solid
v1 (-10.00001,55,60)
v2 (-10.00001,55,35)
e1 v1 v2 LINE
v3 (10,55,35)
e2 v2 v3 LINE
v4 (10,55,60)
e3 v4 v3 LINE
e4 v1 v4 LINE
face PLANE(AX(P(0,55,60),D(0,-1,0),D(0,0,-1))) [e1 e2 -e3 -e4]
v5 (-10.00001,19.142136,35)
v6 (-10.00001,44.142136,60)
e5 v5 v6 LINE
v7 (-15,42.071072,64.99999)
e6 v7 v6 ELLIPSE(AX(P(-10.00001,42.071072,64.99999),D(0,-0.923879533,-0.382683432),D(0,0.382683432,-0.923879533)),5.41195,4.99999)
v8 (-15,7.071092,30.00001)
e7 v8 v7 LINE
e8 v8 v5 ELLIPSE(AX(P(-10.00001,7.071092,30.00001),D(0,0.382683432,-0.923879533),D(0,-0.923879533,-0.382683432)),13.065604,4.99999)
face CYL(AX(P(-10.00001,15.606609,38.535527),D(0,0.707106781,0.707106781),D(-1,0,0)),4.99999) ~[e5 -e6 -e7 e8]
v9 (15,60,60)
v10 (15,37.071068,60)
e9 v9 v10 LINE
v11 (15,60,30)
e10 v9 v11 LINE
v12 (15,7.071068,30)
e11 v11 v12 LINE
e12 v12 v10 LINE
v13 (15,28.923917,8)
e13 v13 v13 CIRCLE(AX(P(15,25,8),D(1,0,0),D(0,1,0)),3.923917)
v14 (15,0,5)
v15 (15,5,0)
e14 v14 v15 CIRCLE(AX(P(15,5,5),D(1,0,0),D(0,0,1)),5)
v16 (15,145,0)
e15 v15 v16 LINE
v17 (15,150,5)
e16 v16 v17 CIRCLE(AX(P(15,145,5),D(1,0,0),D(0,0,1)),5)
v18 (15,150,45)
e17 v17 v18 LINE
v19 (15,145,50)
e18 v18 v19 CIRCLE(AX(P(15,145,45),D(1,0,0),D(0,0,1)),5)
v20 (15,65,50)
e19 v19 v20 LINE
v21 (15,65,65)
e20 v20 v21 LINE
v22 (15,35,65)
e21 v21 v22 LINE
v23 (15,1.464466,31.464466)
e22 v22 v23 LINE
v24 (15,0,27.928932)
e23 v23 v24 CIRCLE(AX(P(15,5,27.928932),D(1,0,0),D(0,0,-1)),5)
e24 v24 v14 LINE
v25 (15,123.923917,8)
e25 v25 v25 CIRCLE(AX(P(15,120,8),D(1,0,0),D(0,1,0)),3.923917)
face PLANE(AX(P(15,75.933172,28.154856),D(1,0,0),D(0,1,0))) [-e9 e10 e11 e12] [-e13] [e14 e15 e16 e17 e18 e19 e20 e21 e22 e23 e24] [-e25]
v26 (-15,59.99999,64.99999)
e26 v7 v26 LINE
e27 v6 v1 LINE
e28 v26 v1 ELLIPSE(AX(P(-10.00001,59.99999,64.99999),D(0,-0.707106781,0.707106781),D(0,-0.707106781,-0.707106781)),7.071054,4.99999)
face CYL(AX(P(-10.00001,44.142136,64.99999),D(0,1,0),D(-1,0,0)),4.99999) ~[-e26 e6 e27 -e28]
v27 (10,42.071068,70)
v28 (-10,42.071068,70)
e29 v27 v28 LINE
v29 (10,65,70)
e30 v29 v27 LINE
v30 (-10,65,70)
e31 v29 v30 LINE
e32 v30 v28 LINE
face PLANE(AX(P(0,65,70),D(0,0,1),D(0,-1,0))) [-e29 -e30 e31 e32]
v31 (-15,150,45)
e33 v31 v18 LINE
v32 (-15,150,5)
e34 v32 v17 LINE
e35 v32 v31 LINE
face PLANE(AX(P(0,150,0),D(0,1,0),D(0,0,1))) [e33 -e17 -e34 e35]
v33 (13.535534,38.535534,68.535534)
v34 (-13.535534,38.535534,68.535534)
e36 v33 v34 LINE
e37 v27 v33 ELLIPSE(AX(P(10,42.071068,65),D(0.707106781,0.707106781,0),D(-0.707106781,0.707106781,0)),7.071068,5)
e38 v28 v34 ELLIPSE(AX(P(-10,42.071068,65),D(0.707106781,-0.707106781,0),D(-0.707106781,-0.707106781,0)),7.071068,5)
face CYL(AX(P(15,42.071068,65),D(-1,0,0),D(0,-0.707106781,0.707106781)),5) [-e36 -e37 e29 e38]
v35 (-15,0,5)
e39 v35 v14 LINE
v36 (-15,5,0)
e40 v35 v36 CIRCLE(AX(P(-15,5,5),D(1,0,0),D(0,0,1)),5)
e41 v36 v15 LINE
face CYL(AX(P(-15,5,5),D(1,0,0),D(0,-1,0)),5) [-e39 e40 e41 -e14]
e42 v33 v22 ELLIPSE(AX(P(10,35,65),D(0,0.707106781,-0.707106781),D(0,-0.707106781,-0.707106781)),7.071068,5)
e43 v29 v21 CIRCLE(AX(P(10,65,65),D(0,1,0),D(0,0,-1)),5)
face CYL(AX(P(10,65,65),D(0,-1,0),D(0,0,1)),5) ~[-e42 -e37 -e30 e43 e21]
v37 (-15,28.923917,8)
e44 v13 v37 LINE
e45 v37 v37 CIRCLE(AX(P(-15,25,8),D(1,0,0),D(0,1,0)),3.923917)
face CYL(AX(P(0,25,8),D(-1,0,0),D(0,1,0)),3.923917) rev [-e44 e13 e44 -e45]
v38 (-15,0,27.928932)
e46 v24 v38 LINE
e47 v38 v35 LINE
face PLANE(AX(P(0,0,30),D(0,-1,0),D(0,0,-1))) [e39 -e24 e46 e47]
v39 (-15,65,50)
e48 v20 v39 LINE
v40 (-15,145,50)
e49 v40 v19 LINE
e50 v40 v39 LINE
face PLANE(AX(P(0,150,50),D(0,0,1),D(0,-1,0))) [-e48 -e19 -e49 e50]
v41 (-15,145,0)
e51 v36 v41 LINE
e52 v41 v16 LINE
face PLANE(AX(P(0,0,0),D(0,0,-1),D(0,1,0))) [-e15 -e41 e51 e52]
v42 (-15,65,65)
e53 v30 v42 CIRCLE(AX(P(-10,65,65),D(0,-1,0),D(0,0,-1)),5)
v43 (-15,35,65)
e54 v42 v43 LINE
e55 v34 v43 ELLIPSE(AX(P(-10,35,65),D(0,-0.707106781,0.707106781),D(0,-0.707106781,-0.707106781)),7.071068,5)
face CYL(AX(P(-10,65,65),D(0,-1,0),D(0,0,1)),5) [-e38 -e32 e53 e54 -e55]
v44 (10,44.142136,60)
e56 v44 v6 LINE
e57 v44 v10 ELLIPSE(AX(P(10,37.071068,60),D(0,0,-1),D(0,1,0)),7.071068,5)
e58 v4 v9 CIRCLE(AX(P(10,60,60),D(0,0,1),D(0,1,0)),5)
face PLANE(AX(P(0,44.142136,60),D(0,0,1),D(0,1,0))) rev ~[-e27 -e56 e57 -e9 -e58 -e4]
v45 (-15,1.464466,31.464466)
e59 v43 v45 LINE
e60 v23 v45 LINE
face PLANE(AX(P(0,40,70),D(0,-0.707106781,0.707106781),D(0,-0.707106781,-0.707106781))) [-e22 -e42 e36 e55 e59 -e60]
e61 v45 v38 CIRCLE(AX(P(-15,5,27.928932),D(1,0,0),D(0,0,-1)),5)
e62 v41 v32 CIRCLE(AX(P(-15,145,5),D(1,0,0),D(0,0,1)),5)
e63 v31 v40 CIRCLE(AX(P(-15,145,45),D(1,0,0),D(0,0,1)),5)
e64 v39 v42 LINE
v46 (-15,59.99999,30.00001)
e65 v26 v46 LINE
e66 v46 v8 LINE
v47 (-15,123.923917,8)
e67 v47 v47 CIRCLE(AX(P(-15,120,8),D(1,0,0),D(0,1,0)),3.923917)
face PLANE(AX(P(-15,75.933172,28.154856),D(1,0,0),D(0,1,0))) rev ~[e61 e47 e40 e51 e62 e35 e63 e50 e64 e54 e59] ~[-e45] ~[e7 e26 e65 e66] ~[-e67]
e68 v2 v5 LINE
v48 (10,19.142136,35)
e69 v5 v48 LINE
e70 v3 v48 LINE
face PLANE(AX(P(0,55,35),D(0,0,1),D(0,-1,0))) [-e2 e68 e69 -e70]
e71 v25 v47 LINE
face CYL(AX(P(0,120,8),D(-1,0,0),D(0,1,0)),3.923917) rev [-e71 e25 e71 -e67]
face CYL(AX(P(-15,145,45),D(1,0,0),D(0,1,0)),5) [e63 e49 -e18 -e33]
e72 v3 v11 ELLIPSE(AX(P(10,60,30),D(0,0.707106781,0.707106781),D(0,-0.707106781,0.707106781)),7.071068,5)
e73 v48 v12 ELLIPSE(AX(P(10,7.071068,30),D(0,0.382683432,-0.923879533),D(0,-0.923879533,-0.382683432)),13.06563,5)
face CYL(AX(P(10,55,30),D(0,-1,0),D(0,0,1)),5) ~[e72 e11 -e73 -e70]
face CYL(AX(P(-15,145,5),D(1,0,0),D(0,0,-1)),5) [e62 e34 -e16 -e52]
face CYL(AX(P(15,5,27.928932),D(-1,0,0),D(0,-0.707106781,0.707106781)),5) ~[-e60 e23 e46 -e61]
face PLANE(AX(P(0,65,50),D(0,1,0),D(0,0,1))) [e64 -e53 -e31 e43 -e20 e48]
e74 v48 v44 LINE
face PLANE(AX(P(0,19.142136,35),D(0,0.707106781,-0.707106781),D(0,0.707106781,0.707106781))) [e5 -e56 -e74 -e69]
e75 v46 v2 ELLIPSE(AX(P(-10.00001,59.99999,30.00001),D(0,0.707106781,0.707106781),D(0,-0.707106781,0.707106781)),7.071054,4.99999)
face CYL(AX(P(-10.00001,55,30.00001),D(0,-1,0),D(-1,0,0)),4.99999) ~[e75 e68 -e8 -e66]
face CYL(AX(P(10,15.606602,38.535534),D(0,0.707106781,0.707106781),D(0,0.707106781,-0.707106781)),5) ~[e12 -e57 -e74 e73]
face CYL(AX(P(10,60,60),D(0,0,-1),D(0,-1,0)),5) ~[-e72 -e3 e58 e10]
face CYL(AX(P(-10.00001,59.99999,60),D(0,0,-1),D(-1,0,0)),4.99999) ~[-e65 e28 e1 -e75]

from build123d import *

# Parameters (mm, degrees)
F0_R     = 3.923916639
F1_DEPTH = 15
F2_R     = 5
F2_R_2   = 4.99999


# Not quite as in the source:
# - a fillet or chamfer is up to 0.001 mm smaller than in the source, because OpenCascade refuses the exact size


with BuildPart() as f1:
    # F0 (on Right) → F1 (new body, symmetric)
    with BuildSketch(Plane.YZ):
        Polygon((0, 30), (0, 0), (150, 0), (150, 50), (65, 50), (65, 70), (40, 70), align=None)
        with Locations((25, 8)):
            Circle(F0_R, mode=Mode.SUBTRACT)
        with Locations((120, 8)):
            Circle(F0_R, mode=Mode.SUBTRACT)
        Polygon((44.1421356237, 60), (55, 60), (55, 35), (19.1421356237, 35), align=None, mode=Mode.SUBTRACT)
    extrude(amount=F1_DEPTH, both=True)

    # F2 (call 1 of 7: OpenCascade refuses the feature's edges together)
    f2_edges = [f1.edges().sort_by_distance(p)[0] for p in [
        (15, 52.5, 70),
        (0, 40, 70),
        (-15, 52.5, 70),
    ]]
    fillet(f2_edges, radius=F2_R)

    # F2#2 (call 2 of 7)
    f2_2_edges = [f1.edges().sort_by_distance(p)[0] for p in [
        (0, 0, 30),
    ]]
    fillet(f2_2_edges, radius=F2_R)

    # F2#3 (call 3 of 7)
    f2_3_edges = [f1.edges().sort_by_distance(p)[0] for p in [
        (0, 0, 0),
    ]]
    fillet(f2_3_edges, radius=F2_R)

    # F2#4 (call 4 of 7)
    f2_4_edges = [f1.edges().sort_by_distance(p)[0] for p in [
        (0, 150, 50),
    ]]
    fillet(f2_4_edges, radius=F2_R)

    # F2#5 (call 5 of 7) (radius 5 in the source; OpenCascade refuses exactly that, so slightly less here)
    f2_5_edges = [f1.edges().sort_by_distance(p)[0] for p in [
        (-15, 37.071068, 35),
        (-15, 55, 47.5),
        (-15, 49.571068, 60),
        (-15, 31.642136, 47.5),
    ]]
    fillet(f2_5_edges, radius=F2_R_2)

    # F2#6 (call 6 of 7)
    f2_6_edges = [f1.edges().sort_by_distance(p)[0] for p in [
        (15, 37.071068, 35),
        (15, 55, 47.5),
        (15, 31.642136, 47.5),
    ]]
    fillet(f2_6_edges, radius=F2_R)

    # F2#7 (call 7 of 7)
    f2_7_edges = [f1.edges().sort_by_distance(p)[0] for p in [
        (0, 150, 0),
    ]]
    fillet(f2_7_edges, radius=F2_R)


solid = f1.part
